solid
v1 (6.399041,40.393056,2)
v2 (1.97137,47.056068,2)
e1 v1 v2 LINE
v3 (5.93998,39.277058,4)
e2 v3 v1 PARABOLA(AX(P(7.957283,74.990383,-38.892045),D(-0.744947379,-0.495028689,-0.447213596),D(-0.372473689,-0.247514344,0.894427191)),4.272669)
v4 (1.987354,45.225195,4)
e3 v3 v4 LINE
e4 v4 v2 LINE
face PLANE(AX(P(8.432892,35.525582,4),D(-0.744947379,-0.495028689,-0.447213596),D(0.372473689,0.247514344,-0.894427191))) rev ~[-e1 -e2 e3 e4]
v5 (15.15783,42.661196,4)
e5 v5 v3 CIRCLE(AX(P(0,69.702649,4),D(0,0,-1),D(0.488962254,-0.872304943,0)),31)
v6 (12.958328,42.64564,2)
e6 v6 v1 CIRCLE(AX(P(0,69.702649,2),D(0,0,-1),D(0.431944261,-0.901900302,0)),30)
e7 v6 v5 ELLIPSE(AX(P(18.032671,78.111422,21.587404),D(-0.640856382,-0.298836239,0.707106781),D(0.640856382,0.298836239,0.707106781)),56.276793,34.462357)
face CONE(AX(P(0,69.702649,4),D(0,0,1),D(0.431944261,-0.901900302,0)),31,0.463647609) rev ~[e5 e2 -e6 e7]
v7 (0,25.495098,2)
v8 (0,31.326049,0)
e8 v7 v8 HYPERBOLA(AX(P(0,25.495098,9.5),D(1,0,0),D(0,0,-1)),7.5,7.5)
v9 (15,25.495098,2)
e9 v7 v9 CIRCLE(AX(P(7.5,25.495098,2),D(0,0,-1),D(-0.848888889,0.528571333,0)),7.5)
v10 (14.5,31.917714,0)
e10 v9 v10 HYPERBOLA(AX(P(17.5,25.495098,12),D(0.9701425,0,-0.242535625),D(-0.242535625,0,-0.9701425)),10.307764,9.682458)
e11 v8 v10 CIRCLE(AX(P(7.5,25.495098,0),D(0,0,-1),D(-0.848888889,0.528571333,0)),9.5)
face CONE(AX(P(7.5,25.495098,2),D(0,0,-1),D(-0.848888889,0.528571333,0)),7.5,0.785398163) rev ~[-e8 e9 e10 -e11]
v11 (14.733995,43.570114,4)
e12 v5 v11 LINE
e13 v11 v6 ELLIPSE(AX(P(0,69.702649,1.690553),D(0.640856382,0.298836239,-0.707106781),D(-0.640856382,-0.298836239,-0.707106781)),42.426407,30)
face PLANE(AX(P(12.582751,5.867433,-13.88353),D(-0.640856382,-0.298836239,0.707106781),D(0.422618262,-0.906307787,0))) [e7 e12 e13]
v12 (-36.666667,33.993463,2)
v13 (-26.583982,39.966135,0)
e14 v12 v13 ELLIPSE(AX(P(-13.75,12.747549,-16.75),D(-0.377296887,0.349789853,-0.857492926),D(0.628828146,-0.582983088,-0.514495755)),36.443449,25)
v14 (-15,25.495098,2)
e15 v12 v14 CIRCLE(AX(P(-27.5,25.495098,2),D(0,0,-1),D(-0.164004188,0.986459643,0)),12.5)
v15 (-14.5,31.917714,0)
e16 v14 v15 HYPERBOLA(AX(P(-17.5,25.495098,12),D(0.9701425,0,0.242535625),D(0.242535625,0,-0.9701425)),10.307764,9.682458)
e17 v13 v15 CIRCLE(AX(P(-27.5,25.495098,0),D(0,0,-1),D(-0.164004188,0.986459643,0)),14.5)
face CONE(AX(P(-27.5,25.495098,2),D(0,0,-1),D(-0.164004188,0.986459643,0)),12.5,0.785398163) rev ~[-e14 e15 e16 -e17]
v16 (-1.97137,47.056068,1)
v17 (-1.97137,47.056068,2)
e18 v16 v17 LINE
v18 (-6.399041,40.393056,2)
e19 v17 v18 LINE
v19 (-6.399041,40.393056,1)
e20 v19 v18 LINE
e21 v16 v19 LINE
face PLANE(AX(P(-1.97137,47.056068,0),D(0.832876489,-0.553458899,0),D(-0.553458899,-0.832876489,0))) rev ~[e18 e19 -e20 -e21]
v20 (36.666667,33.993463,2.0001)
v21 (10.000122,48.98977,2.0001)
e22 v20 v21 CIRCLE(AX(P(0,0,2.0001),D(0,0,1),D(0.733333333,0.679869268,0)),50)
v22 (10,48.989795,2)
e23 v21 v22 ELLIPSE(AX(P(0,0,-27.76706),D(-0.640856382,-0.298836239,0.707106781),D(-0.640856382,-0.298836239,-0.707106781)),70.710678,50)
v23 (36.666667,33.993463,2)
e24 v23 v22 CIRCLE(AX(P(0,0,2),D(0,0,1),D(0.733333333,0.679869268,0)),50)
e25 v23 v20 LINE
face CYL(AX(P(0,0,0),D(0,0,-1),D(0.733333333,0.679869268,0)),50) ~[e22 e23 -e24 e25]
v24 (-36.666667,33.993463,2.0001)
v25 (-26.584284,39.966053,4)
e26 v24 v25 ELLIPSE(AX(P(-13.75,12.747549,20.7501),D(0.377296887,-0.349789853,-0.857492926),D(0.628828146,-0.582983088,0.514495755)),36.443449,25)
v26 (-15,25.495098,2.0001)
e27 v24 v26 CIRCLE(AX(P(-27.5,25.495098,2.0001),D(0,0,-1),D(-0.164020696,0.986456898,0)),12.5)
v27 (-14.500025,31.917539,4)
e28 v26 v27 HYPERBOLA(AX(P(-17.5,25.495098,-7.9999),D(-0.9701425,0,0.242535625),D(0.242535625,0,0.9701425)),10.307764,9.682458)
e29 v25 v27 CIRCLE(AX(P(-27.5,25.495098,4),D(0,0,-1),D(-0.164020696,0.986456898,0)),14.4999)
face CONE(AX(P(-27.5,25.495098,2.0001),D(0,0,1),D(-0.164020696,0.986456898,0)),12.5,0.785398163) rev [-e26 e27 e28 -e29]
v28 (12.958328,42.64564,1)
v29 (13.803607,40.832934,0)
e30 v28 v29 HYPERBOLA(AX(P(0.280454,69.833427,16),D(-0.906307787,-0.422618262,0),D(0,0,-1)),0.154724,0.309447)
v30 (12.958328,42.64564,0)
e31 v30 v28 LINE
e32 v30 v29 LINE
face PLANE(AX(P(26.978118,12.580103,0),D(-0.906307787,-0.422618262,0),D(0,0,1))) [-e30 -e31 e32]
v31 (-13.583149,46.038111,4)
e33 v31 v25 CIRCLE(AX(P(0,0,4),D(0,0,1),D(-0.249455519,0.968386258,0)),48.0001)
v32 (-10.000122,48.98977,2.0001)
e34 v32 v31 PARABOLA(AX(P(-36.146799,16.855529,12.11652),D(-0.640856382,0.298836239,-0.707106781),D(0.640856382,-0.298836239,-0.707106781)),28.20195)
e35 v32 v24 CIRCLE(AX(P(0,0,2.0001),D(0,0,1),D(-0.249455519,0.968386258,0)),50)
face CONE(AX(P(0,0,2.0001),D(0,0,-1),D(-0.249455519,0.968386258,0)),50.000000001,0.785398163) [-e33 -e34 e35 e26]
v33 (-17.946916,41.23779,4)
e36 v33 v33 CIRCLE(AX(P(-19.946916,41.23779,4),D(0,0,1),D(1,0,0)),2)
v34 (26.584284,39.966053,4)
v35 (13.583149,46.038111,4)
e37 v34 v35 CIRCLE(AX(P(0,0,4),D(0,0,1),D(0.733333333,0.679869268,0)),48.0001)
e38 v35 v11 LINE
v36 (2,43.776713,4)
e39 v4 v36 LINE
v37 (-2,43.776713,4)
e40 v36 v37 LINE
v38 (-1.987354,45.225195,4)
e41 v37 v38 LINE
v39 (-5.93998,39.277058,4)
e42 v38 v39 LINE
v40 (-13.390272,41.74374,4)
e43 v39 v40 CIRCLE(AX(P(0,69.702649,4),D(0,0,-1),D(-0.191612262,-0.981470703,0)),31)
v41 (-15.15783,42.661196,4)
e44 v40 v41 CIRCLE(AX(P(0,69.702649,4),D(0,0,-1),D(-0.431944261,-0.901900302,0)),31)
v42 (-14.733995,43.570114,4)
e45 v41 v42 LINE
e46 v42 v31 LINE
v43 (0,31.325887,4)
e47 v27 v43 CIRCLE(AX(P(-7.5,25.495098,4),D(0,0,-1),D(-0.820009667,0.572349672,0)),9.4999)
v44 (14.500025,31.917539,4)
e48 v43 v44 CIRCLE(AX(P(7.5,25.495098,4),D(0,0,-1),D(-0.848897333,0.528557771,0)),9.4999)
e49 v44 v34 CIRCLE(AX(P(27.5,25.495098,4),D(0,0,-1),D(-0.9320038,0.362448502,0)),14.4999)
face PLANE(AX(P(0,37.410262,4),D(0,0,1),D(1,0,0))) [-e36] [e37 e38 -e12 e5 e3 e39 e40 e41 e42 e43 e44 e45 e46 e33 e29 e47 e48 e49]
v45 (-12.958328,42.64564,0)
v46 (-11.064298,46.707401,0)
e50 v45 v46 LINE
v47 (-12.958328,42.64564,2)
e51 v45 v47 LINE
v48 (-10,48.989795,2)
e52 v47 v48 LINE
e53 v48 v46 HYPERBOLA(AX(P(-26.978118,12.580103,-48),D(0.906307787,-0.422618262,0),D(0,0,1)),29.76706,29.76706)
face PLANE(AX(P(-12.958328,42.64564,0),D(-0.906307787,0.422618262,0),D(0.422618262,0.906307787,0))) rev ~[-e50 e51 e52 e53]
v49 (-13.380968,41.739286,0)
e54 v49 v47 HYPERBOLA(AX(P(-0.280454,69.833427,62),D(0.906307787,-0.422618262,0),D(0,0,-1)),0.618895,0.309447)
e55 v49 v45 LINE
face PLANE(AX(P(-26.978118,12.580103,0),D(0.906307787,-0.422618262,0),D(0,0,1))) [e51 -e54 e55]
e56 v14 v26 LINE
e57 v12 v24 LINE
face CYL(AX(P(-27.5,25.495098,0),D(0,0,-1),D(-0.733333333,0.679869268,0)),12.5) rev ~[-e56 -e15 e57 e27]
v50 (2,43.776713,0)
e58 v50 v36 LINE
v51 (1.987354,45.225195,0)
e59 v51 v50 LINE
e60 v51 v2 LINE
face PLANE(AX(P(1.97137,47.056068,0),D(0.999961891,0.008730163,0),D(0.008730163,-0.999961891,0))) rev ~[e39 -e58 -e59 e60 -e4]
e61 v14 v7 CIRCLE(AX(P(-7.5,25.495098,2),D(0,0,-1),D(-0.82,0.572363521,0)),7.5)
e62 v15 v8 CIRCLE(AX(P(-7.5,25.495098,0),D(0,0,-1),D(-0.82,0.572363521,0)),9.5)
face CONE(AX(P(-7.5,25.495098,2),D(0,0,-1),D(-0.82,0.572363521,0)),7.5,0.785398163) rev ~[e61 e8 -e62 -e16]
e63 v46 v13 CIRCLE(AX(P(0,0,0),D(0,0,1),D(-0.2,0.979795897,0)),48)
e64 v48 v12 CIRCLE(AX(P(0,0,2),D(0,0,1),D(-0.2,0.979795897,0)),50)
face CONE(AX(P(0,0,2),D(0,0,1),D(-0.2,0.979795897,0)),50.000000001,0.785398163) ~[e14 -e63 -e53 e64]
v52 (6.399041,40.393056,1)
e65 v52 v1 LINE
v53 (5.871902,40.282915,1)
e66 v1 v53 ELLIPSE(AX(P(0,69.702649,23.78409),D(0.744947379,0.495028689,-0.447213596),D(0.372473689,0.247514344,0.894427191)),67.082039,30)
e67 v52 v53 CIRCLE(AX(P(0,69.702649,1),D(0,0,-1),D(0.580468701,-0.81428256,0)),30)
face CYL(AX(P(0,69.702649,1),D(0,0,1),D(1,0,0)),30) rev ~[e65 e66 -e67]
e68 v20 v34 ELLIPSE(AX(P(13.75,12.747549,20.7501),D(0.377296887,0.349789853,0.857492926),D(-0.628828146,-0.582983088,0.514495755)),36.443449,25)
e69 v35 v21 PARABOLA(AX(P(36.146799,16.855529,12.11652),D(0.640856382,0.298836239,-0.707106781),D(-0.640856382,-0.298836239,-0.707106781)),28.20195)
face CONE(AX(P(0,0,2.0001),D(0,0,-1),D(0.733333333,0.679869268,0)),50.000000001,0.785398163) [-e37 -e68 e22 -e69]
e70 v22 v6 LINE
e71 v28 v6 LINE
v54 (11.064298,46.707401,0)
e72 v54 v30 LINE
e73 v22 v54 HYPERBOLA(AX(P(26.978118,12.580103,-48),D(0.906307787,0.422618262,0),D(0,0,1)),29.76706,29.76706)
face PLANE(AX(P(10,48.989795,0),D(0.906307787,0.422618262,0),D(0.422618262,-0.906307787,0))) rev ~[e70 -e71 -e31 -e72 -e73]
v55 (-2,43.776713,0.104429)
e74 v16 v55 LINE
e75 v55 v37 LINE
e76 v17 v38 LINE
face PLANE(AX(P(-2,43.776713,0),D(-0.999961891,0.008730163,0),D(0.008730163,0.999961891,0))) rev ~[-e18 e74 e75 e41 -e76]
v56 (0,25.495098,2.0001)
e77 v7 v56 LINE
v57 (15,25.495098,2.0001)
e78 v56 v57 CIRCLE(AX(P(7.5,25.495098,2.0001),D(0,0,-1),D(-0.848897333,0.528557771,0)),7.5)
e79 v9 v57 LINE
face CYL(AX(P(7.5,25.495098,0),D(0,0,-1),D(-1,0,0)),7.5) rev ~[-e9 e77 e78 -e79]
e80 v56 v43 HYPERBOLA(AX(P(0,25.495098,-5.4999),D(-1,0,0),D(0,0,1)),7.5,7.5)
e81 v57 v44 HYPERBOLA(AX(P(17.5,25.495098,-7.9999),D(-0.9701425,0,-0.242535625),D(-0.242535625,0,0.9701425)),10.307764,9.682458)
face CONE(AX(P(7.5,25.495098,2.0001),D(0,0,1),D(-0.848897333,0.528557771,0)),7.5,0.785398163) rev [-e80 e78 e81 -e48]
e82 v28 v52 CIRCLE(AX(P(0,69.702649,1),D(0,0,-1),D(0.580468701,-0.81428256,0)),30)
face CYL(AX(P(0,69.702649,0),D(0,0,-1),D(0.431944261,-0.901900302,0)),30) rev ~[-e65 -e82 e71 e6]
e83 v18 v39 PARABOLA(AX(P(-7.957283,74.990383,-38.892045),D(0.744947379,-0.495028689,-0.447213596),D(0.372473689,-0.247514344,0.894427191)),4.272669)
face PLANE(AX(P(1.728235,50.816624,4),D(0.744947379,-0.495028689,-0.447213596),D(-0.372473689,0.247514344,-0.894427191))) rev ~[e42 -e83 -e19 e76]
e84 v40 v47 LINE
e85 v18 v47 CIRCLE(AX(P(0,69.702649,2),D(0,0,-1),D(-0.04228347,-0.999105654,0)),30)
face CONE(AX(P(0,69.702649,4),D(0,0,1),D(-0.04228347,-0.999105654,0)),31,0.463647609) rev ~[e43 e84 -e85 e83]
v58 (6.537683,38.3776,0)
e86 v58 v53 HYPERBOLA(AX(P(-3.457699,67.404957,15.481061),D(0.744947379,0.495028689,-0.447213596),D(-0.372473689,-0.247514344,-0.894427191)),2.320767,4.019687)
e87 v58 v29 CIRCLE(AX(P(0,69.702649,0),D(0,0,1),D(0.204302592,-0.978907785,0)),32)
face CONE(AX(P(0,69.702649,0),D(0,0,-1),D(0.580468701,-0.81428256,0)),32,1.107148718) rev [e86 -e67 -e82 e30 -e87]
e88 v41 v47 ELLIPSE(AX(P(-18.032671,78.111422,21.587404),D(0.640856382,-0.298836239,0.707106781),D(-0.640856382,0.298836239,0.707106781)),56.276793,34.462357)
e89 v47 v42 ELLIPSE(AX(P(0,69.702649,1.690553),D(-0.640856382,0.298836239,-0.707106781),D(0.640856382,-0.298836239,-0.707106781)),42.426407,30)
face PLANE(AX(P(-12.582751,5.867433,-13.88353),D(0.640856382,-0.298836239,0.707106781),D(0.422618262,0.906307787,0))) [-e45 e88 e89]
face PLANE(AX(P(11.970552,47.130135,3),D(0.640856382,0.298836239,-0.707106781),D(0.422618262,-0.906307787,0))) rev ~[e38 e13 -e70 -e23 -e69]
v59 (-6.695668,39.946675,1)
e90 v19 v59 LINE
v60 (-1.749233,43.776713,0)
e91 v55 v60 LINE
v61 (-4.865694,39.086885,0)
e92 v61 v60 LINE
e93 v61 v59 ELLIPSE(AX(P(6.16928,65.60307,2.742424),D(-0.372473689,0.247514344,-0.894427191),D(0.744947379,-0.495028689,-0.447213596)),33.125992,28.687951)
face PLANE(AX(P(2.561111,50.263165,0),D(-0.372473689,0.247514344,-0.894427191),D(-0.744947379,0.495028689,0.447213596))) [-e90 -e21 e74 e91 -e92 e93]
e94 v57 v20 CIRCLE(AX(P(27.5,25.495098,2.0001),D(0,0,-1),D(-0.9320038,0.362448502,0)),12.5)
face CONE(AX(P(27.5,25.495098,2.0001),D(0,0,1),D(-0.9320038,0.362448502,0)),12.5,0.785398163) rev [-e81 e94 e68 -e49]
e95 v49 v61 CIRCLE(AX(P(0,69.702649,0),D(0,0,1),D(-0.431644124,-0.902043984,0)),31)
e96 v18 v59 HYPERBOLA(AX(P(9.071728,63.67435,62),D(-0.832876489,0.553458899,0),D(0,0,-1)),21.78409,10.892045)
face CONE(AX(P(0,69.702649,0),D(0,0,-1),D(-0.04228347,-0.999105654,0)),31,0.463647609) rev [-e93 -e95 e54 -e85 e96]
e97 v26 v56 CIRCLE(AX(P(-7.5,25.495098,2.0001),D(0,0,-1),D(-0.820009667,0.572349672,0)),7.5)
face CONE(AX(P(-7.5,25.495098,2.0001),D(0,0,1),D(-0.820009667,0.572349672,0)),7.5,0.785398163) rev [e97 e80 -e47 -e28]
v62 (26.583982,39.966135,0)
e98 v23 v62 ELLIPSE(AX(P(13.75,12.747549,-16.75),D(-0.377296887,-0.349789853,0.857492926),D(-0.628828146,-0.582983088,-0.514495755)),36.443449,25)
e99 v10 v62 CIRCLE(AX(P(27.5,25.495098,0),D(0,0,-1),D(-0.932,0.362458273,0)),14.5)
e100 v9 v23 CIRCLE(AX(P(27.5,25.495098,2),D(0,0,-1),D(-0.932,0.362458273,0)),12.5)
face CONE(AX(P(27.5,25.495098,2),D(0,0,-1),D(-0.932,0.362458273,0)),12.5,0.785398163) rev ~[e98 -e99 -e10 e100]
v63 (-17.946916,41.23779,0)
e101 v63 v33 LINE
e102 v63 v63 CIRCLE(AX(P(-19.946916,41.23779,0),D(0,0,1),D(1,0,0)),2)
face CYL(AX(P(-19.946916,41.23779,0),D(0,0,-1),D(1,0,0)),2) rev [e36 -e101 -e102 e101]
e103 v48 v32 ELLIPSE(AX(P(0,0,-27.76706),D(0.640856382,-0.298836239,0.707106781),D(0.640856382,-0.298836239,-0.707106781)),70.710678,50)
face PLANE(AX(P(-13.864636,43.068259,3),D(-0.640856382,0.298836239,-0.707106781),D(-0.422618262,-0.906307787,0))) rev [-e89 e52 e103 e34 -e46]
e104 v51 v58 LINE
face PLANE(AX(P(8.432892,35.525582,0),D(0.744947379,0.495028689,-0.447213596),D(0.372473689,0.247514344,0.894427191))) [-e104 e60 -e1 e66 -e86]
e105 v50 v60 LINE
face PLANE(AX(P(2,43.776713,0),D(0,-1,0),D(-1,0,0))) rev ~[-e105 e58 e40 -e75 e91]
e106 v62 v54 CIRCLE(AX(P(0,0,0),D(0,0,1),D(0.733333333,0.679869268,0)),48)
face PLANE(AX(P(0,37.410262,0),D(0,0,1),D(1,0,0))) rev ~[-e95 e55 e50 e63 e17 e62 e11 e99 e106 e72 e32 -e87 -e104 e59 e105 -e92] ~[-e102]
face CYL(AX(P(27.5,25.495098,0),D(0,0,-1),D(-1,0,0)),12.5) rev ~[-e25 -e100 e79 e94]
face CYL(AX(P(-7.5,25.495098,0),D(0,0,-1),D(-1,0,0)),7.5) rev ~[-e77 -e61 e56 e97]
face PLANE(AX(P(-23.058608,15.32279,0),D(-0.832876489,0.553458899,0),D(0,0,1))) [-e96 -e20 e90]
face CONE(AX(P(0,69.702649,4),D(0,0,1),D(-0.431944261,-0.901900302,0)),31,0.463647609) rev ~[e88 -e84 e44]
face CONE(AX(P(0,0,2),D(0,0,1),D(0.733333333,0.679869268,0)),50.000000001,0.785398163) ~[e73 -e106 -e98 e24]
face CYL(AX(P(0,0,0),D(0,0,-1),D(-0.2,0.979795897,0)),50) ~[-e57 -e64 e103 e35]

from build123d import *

# Parameters (mm, degrees)
F0_R          = 2
F1_DEPTH      = 4
F2_C1_SIZE    = 2
F2_C2_SIZE    = 1.9999
F2_C3_SIZE    = 2
F2_C4_SIZE    = 2
F2_C5_SIZE    = 2
F2_C6_SIZE    = 1.9999
F2_C7_SIZE    = 2
F2_C8_SIZE    = 1.9999
F2_C9_SIZE    = 2
F2_C10_SIZE   = 1.9999
F2_C11_SIZE   = 2
F2_C12_SIZE   = 1.9999
F2_C13_SIZE   = 2
F2_C14_SIZE   = 1.9999
F3_T4_ANGLE   = 23.1676243984
F3_T9_ANGLE   = 33.0601284412
F3_T15_ANGLE  = 23.1676243984
F3_T20_ANGLE  = 33.0601284412
F3_T26_DEPTH  = 18.3593154951
F3_S27_R      = 30
F3_T28_DEPTH  = 11
F3_T32_DEPTH  = 18.3593154951
F3_S33_R      = 30
F3_T34_DEPTH  = 12
F3_T38_DEPTH  = 18.3593154951
F3_S39_R      = 30
F3_T40_DEPTH  = 11
F3_T44_DEPTH  = 18.3593154951
F3_S45_R      = 30
F3_T46_DEPTH  = 11
F3_T50_ANGLE  = 13.7165010336
F3_T55_ANGLE  = 13.7165010336
F3_T61_ANGLE  = 23.1676243984
F3_T65_DEPTH  = 18.3593154951
F3_S66_R      = 30
F3_T67_DEPTH  = 11
F3_T73_ANGLE  = 33.0601284412
F3_T77_DEPTH  = 18.3593154951
F3_S78_R      = 30
F3_T79_DEPTH  = 12
F3_T85_ANGLE  = 23.1676243984
F3_T89_DEPTH  = 18.3593154951
F3_S90_R      = 30
F3_T91_DEPTH  = 11
F3_T97_ANGLE  = 33.0601284412
F3_T101_DEPTH = 18.3593154951
F3_S102_R     = 30
F3_T103_DEPTH = 11


# Not quite as in the source:
# - a fillet or chamfer that OpenCascade refuses, or shapes differently, is made with other operations: its cross-section is extruded or revolved along the edge and cut away or added
# - a fillet or chamfer is up to 0.001 mm smaller than in the source, because OpenCascade refuses the exact size


with BuildPart() as f1:
    # F0 (on Top) → F1 (new body)
    with BuildSketch(Plane.XY):
        with BuildLine():
            Line((-12.9583278322, 42.6456403464), (-10, 48.9897948557))
            ThreePointArc((-10, 48.9897948557), (-24.5085073708, 43.5813385115), (-36.6666666667, 33.993463424))
            ThreePointArc((-36.6666666667, 33.993463424), (-22.9356453541, 37.1319642711), (-15, 25.495097568))
            ThreePointArc((-15, 25.495097568), (-7.5, 32.995097568), (0, 25.495097568))
            ThreePointArc((0, 25.495097568), (7.5, 32.995097568), (15, 25.495097568))
            ThreePointArc((15, 25.495097568), (22.9356453541, 37.1319642711), (36.6666666667, 33.993463424))
            ThreePointArc((36.6666666667, 33.993463424), (24.5085073708, 43.5813385115), (10, 48.9897948557))
            Line((10, 48.9897948557), (12.9583278322, 42.6456403464))
            ThreePointArc((12.9583278322, 42.6456403464), (9.7439963261, 41.3291664505), (6.3990408051, 40.3930558198))
            ThreePointArc((6.3990408051, 40.3930558198), (0, 39.702649416), (-6.3990408051, 40.3930558198))
            ThreePointArc((-6.3990408051, 40.3930558198), (-9.7439963261, 41.3291664505), (-12.9583278322, 42.6456403464))
        make_face()
        with Locations((-19.9469160289, 41.2377901375)):
            Circle(F0_R, mode=Mode.SUBTRACT)
        with BuildLine():
            Line((-1.9713696092, 47.056067735), (-6.3990408051, 40.3930558198))
            ThreePointArc((-6.3990408051, 40.3930558198), (0, 39.702649416), (6.3990408051, 40.3930558198))
            Line((6.3990408051, 40.3930558198), (1.9713696092, 47.056067735))
            Line((1.9713696092, 47.056067735), (2, 43.7767133248))
            Line((2, 43.7767133248), (0, 43.7767133248))
            Line((0, 43.7767133248), (-2, 43.7767133248))
            Line((-2, 43.7767133248), (-1.9713696092, 47.056067735))
        make_face()
    extrude(amount=F1_DEPTH)

    # F2: chamfer of 2 on 14 edges, made by hand

    # F2_c1
    f2_c1_edges = [f1.edges().sort_by_distance(p)[0] for p in [
        (24.5085073708, 43.5813385115, 0),
    ]]
    chamfer(f2_c1_edges, length=F2_C1_SIZE)

    # F2_c2 (size 2 in the source; OpenCascade refuses exactly that, so slightly less here)
    f2_c2_edges = [f1.edges().sort_by_distance(p)[0] for p in [
        (24.5085073708, 43.5813385115, 4),
    ]]
    chamfer(f2_c2_edges, length=F2_C2_SIZE)

    # F2_c3
    f2_c3_edges = [f1.edges().sort_by_distance(p)[0] for p in [
        (12.011285826, 44.6765784827, 4),
    ]]
    chamfer(f2_c3_edges, length=F2_C3_SIZE)

    # F2_c4
    f2_c4_edges = [f1.edges().sort_by_distance(p)[0] for p in [
        (-11.4791639161, 45.817717601, 4),
    ]]
    chamfer(f2_c4_edges, length=F2_C4_SIZE)

    # F2_c5
    f2_c5_edges = [f1.edges().sort_by_distance(p)[0] for p in [
        (-24.5085073708, 43.5813385115, 0),
    ]]
    chamfer(f2_c5_edges, length=F2_C5_SIZE)

    # F2_c6 (size 2 in the source; OpenCascade refuses exactly that, so slightly less here)
    f2_c6_edges = [f1.edges().sort_by_distance(p)[0] for p in [
        (-25.6065907207, 42.9453433059, 4),
    ]]
    chamfer(f2_c6_edges, length=F2_C6_SIZE)

    # F2_c7
    f2_c7_edges = [f1.edges().sort_by_distance(p)[0] for p in [
        (-19.4184053045, 35.031230284, 0),
    ]]
    chamfer(f2_c7_edges, length=F2_C7_SIZE)

    # F2_c8 (size 2 in the source; OpenCascade refuses exactly that, so slightly less here)
    f2_c8_edges = [f1.edges().sort_by_distance(p)[0] for p in [
        (-19.4184850979, 35.031297906, 4),
    ]]
    chamfer(f2_c8_edges, length=F2_C8_SIZE)

    # F2_c9
    f2_c9_edges = [f1.edges().sort_by_distance(p)[0] for p in [
        (-5.25, 32.6496415786, 0),
    ]]
    chamfer(f2_c9_edges, length=F2_C9_SIZE)

    # F2_c10 (size 2 in the source; OpenCascade refuses exactly that, so slightly less here)
    f2_c10_edges = [f1.edges().sort_by_distance(p)[0] for p in [
        (-5.2500604173, 32.6496605787, 4),
    ]]
    chamfer(f2_c10_edges, length=F2_C10_SIZE)

    # F2_c11
    f2_c11_edges = [f1.edges().sort_by_distance(p)[0] for p in [
        (9.5615528128, 32.7062001189, 0),
    ]]
    chamfer(f2_c11_edges, length=F2_C11_SIZE)

    # F2_c12 (size 2 in the source; OpenCascade refuses exactly that, so slightly less here)
    f2_c12_edges = [f1.edges().sort_by_distance(p)[0] for p in [
        (9.5614952101, 32.7062165864, 4),
    ]]
    chamfer(f2_c12_edges, length=F2_C12_SIZE)

    # F2_c13
    f2_c13_edges = [f1.edges().sort_by_distance(p)[0] for p in [
        (21.3153564799, 36.3578865528, 0),
    ]]
    chamfer(f2_c13_edges, length=F2_C13_SIZE)

    # F2_c14 (size 2 in the source; OpenCascade refuses exactly that, so slightly less here)
    f2_c14_edges = [f1.edges().sort_by_distance(p)[0] for p in [
        (21.3153904307, 36.3579058824, 4),
    ]]
    chamfer(f2_c14_edges, length=F2_C14_SIZE)

    # F3: chamfer of 2 x 1 on 8 edges, made by hand


with BuildPart() as f3_tool2:
    # F3_s3 → F3_t4 (revolve)
    with BuildSketch(Plane(origin=(-2.9446339923, 0.1246207965, 0), x_dir=(0, 0, 1), z_dir=(0.9991056542, -0.0422834698, 0))):
        Polygon((4, -38.6403111418), (2, -39.6403111418), (4, -39.6403111418), align=None)
    revolve(axis=Axis((0, 69.702649416, 4), (0, 0, -1)), revolution_arc=F3_T4_ANGLE)

    split(bisect_by=Plane(origin=(-23.0586077624, 15.3227901596, 0), x_dir=(0, 0, 1), z_dir=(-0.8328764894, 0.5534588995, 0)), keep=Keep.TOP)


with BuildPart() as f1_1:
    add(f1.part)

    # F3_t1: cut F3_tool2
    add(f3_tool2.part, mode=Mode.SUBTRACT)


with BuildPart() as f3_tool7:
    # F3_s8 → F3_t9 (revolve)
    with BuildSketch(Plane(origin=(-2.9446339923, 0.1246207965, 0), x_dir=(0, 0, 1), z_dir=(0.9991056542, -0.0422834698, 0))):
        Polygon((0, -38.6403111418), (2, -39.6403111418), (0, -39.6403111418), align=None)
    revolve(axis=Axis((0, 69.702649416, 0), (0, 0, -1)), revolution_arc=F3_T9_ANGLE)

    split(bisect_by=Plane(origin=(-23.0586077624, 15.3227901596, 0), x_dir=(0, 0, 1), z_dir=(-0.8328764894, 0.5534588995, 0)), keep=Keep.TOP)

    split(bisect_by=Plane(origin=(-26.9781181078, 12.5801030763, 0), x_dir=(0, 0, 1), z_dir=(0.906307787, -0.4226182617, 0)), keep=Keep.TOP)


with BuildPart() as f1_2:
    add(f1_1.part)

    # F3_t6: cut F3_tool7
    add(f3_tool7.part, mode=Mode.SUBTRACT)


with BuildPart() as f3_tool13:
    # F3_s14 → F3_t15 (revolve)
    with BuildSketch(Plane(origin=(27.1541071122, 13.0048306908, 0), x_dir=(0, 0, 1), z_dir=(0.9019003023, 0.4319442611, 0))):
        Polygon((4, -31.8648405809), (2, -32.8648405809), (4, -32.8648405809), align=None)
    revolve(axis=Axis((0, 69.702649416, 4), (0, 0, -1)), revolution_arc=F3_T15_ANGLE)

    split(bisect_by=Plane(origin=(23.0586077624, 15.3227901596, 0), x_dir=(0, 0, 1), z_dir=(0.8328764894, 0.5534588995, 0)), keep=Keep.TOP)


with BuildPart() as f1_3:
    add(f1_2.part)

    # F3_t12: cut F3_tool13
    add(f3_tool13.part, mode=Mode.SUBTRACT)


with BuildPart() as f3_tool18:
    # F3_s19 → F3_t20 (revolve)
    with BuildSketch(Plane(origin=(32.9460403942, 23.4858833946, 0), x_dir=(0, 0, 1), z_dir=(0.8142825601, 0.5804687006, 0))):
        Polygon((0, -24.7576518113), (1, -26.7576518113), (0, -26.7576518113), align=None)
    revolve(axis=Axis((0, 69.702649416, 0), (0, 0, -1)), revolution_arc=F3_T20_ANGLE)

    split(bisect_by=Plane(origin=(23.0586077624, 15.3227901596, 0), x_dir=(0, 0, 1), z_dir=(0.8328764894, 0.5534588995, 0)), keep=Keep.TOP)

    split(bisect_by=Plane(origin=(26.9781181078, 12.5801030763, 0), x_dir=(0, 0, 1), z_dir=(-0.906307787, -0.4226182617, 0)), keep=Keep.TOP)


with BuildPart() as f1_4:
    add(f1_3.part)

    # F3_t17: cut F3_tool18
    add(f3_tool18.part, mode=Mode.SUBTRACT)


with BuildPart() as f3_tool24:
    # F3_s25 → F3_t26 (new body)
    with BuildSketch(Plane(origin=(23.9539658298, 36.0472927364, 0), x_dir=(0, 0, 1), z_dir=(-0.5534588995, -0.8328764894, 0))):
        Polygon((4, 26.6855068621), (2, 27.6855068621), (4, 27.6855068621), align=None)
    extrude(amount=F3_T26_DEPTH)

    # F3_s27 → F3_t28 (intersect, symmetric)
    with BuildSketch(Plane.XY.offset(3)):
        with Locations((0, 69.702649416)):
            Circle(F3_S27_R)
    extrude(amount=F3_T28_DEPTH, both=True, mode=Mode.INTERSECT)


with BuildPart() as f1_5:
    add(f1_4.part)

    # F3_t23: cut F3_tool24
    add(f3_tool24.part, mode=Mode.SUBTRACT)


with BuildPart() as f3_tool30:
    # F3_s31 → F3_t32 (new body)
    with BuildSketch(Plane(origin=(23.9539658298, 36.0472927364, 0), x_dir=(0, 0, 1), z_dir=(-0.5534588995, -0.8328764894, 0))):
        Polygon((0, 25.6855068621), (1, 27.6855068621), (0, 27.6855068621), align=None)
    extrude(amount=F3_T32_DEPTH)

    # F3_s33 → F3_t34 (intersect, symmetric)
    with BuildSketch(Plane.XY.offset(0.5)):
        with Locations((0, 69.702649416)):
            Circle(F3_S33_R)
    extrude(amount=F3_T34_DEPTH, both=True, mode=Mode.INTERSECT)


with BuildPart() as f1_6:
    add(f1_5.part)

    # F3_t29: cut F3_tool30
    add(f3_tool30.part, mode=Mode.SUBTRACT)


with BuildPart() as f3_tool36:
    # F3_s37 → F3_t38 (new body)
    with BuildSketch(Plane(origin=(-13.7928392805, 20.7562504992, 0), x_dir=(0, 0, 1), z_dir=(-0.5534588995, 0.8328764894, 0))):
        Polygon((4, 26.6855068621), (2, 27.6855068621), (4, 27.6855068621), align=None)
    extrude(amount=F3_T38_DEPTH)

    # F3_s39 → F3_t40 (intersect, symmetric)
    with BuildSketch(Plane.XY.offset(3)):
        with Locations((0, 69.702649416)):
            Circle(F3_S39_R)
    extrude(amount=F3_T40_DEPTH, both=True, mode=Mode.INTERSECT)


with BuildPart() as f1_7:
    add(f1_6.part)

    # F3_t35: cut F3_tool36
    add(f3_tool36.part, mode=Mode.SUBTRACT)


with BuildPart() as f3_tool42:
    # F3_s43 → F3_t44 (new body)
    with BuildSketch(Plane(origin=(-13.7928392805, 20.7562504992, 0), x_dir=(0, 0, 1), z_dir=(-0.5534588995, 0.8328764894, 0))):
        Polygon((0, 26.6855068621), (2, 27.6855068621), (0, 27.6855068621), align=None)
    extrude(amount=F3_T44_DEPTH)

    # F3_s45 → F3_t46 (intersect, symmetric)
    with BuildSketch(Plane.XY.offset(1)):
        with Locations((0, 69.702649416)):
            Circle(F3_S45_R)
    extrude(amount=F3_T46_DEPTH, both=True, mode=Mode.INTERSECT)


with BuildPart() as f1_8:
    add(f1_7.part)

    # F3_t41: cut F3_tool42
    add(f3_tool42.part, mode=Mode.SUBTRACT)


with BuildPart() as f3_tool48:
    # F3_s49 → F3_t50 (revolve)
    with BuildSketch(Plane(origin=(27.1541071122, 13.0048306908, 0), x_dir=(0, 0, 1), z_dir=(-0.9019003023, -0.4319442611, 0))):
        Polygon((4, 31.8648405809), (2, 32.8648405809), (4, 32.8648405809), align=None)
    revolve(axis=Axis((0, 69.702649416, 4), (0, 0, 1)), revolution_arc=F3_T50_ANGLE)

    split(bisect_by=Plane(origin=(12.5827512669, 5.8674332764, -13.8835299077), x_dir=(0.4226182617, -0.906307787, 0), z_dir=(-0.6408563821, -0.2988362387, 0.7071067812)), keep=Keep.TOP)


with BuildPart() as f1_9:
    add(f1_8.part)

    # F3_t47: cut F3_tool48
    add(f3_tool48.part, mode=Mode.SUBTRACT)


with BuildPart() as f3_tool53:
    # F3_s54 → F3_t55 (revolve)
    with BuildSketch(Plane(origin=(-27.1541071122, 13.0048306908, 0), x_dir=(0, 0, 1), z_dir=(0.9019003023, -0.4319442611, 0))):
        Polygon((4, -31.8648405809), (2, -32.8648405809), (4, -32.8648405809), align=None)
    revolve(axis=Axis((0, 69.702649416, 4), (0, 0, -1)), revolution_arc=F3_T55_ANGLE)

    split(bisect_by=Plane(origin=(-12.5827512669, 5.8674332764, -13.8835299077), x_dir=(0.4226182617, 0.906307787, 0), z_dir=(0.6408563821, -0.2988362387, 0.7071067812)), keep=Keep.TOP)


with BuildPart() as f1_10:
    add(f1_9.part)

    # F3_t52: cut F3_tool53
    add(f3_tool53.part, mode=Mode.SUBTRACT)


with BuildPart() as f3_tool59:
    # F3_s60 → F3_t61 (revolve)
    with BuildSketch(Plane(origin=(-2.9446339923, 0.1246207965, 0), x_dir=(0, 0, 1), z_dir=(0.9991056542, -0.0422834698, 0))):
        Polygon((4, -38.6403111418), (2, -39.6403111418), (4, -39.6403111418), align=None)
    revolve(axis=Axis((0, 69.702649416, 4), (0, 0, -1)), revolution_arc=F3_T61_ANGLE)

    split(bisect_by=Plane(origin=(-23.0586077624, 15.3227901596, 0), x_dir=(0, 0, 1), z_dir=(0.8328764894, -0.5534588995, 0)), keep=Keep.TOP)


with BuildPart() as f3_tool63:
    # F3_s64 → F3_t65 (new body)
    with BuildSketch(Plane(origin=(23.9539658298, 36.0472927364, 0), x_dir=(0, 0, 1), z_dir=(-0.5534588995, -0.8328764894, 0))):
        Polygon((4, 26.6855068621), (2, 27.6855068621), (4, 27.6855068621), align=None)
    extrude(amount=F3_T65_DEPTH)

    # F3_s66 → F3_t67 (cut, symmetric)
    with BuildSketch(Plane.XY.offset(3)):
        with Locations((0, 69.702649416)):
            Circle(F3_S66_R)
    extrude(amount=F3_T67_DEPTH, both=True, mode=Mode.SUBTRACT)


with BuildPart() as f3_tool59_1:
    add(f3_tool59.part)

    # F3_t68: intersect F3_tool63
    add(f3_tool63.part, mode=Mode.INTERSECT)


with BuildPart() as f1_11:
    add(f1_10.part)

    # F3_t57: cut F3_tool59
    add(f3_tool59_1.part, mode=Mode.SUBTRACT)


with BuildPart() as f3_tool71:
    # F3_s72 → F3_t73 (revolve)
    with BuildSketch(Plane(origin=(-2.9446339923, 0.1246207965, 0), x_dir=(0, 0, 1), z_dir=(0.9991056542, -0.0422834698, 0))):
        Polygon((0, -38.6403111418), (2, -39.6403111418), (0, -39.6403111418), align=None)
    revolve(axis=Axis((0, 69.702649416, 0), (0, 0, -1)), revolution_arc=F3_T73_ANGLE)

    split(bisect_by=Plane(origin=(-23.0586077624, 15.3227901596, 0), x_dir=(0, 0, 1), z_dir=(0.8328764894, -0.5534588995, 0)), keep=Keep.TOP)


with BuildPart() as f3_tool75:
    # F3_s76 → F3_t77 (new body)
    with BuildSketch(Plane(origin=(23.9539658298, 36.0472927364, 0), x_dir=(0, 0, 1), z_dir=(-0.5534588995, -0.8328764894, 0))):
        Polygon((0, 25.6855068621), (1, 27.6855068621), (0, 27.6855068621), align=None)
    extrude(amount=F3_T77_DEPTH)

    # F3_s78 → F3_t79 (cut, symmetric)
    with BuildSketch(Plane.XY.offset(0.5)):
        with Locations((0, 69.702649416)):
            Circle(F3_S78_R)
    extrude(amount=F3_T79_DEPTH, both=True, mode=Mode.SUBTRACT)


with BuildPart() as f3_tool71_1:
    add(f3_tool71.part)

    # F3_t80: intersect F3_tool75
    add(f3_tool75.part, mode=Mode.INTERSECT)


with BuildPart() as f1_12:
    add(f1_11.part)

    # F3_t69: cut F3_tool71
    add(f3_tool71_1.part, mode=Mode.SUBTRACT)


with BuildPart() as f3_tool83:
    # F3_s84 → F3_t85 (revolve)
    with BuildSketch(Plane(origin=(27.1541071122, 13.0048306908, 0), x_dir=(0, 0, 1), z_dir=(0.9019003023, 0.4319442611, 0))):
        Polygon((4, -31.8648405809), (2, -32.8648405809), (4, -32.8648405809), align=None)
    revolve(axis=Axis((0, 69.702649416, 4), (0, 0, -1)), revolution_arc=F3_T85_ANGLE)

    split(bisect_by=Plane(origin=(23.0586077624, 15.3227901596, 0), x_dir=(0, 0, 1), z_dir=(-0.8328764894, -0.5534588995, 0)), keep=Keep.TOP)


with BuildPart() as f3_tool87:
    # F3_s88 → F3_t89 (new body)
    with BuildSketch(Plane(origin=(-13.7928392805, 20.7562504992, 0), x_dir=(0, 0, 1), z_dir=(-0.5534588995, 0.8328764894, 0))):
        Polygon((4, 26.6855068621), (2, 27.6855068621), (4, 27.6855068621), align=None)
    extrude(amount=F3_T89_DEPTH)

    # F3_s90 → F3_t91 (cut, symmetric)
    with BuildSketch(Plane.XY.offset(3)):
        with Locations((0, 69.702649416)):
            Circle(F3_S90_R)
    extrude(amount=F3_T91_DEPTH, both=True, mode=Mode.SUBTRACT)


with BuildPart() as f3_tool83_1:
    add(f3_tool83.part)

    # F3_t92: intersect F3_tool87
    add(f3_tool87.part, mode=Mode.INTERSECT)


with BuildPart() as f1_13:
    add(f1_12.part)

    # F3_t81: cut F3_tool83
    add(f3_tool83_1.part, mode=Mode.SUBTRACT)


with BuildPart() as f3_tool95:
    # F3_s96 → F3_t97 (revolve)
    with BuildSketch(Plane(origin=(32.9460403942, 23.4858833946, 0), x_dir=(0, 0, 1), z_dir=(0.8142825601, 0.5804687006, 0))):
        Polygon((0, -24.7576518113), (1, -26.7576518113), (0, -26.7576518113), align=None)
    revolve(axis=Axis((0, 69.702649416, 0), (0, 0, -1)), revolution_arc=F3_T97_ANGLE)

    split(bisect_by=Plane(origin=(23.0586077624, 15.3227901596, 0), x_dir=(0, 0, 1), z_dir=(-0.8328764894, -0.5534588995, 0)), keep=Keep.TOP)


with BuildPart() as f3_tool99:
    # F3_s100 → F3_t101 (new body)
    with BuildSketch(Plane(origin=(-13.7928392805, 20.7562504992, 0), x_dir=(0, 0, 1), z_dir=(-0.5534588995, 0.8328764894, 0))):
        Polygon((0, 26.6855068621), (2, 27.6855068621), (0, 27.6855068621), align=None)
    extrude(amount=F3_T101_DEPTH)

    # F3_s102 → F3_t103 (cut, symmetric)
    with BuildSketch(Plane.XY.offset(1)):
        with Locations((0, 69.702649416)):
            Circle(F3_S102_R)
    extrude(amount=F3_T103_DEPTH, both=True, mode=Mode.SUBTRACT)


with BuildPart() as f3_tool95_1:
    add(f3_tool95.part)

    # F3_t104: intersect F3_tool99
    add(f3_tool99.part, mode=Mode.INTERSECT)


with BuildPart() as f1_14:
    add(f1_13.part)

    # F3_t93: cut F3_tool95
    add(f3_tool95_1.part, mode=Mode.SUBTRACT)


solid = f1_14.part
